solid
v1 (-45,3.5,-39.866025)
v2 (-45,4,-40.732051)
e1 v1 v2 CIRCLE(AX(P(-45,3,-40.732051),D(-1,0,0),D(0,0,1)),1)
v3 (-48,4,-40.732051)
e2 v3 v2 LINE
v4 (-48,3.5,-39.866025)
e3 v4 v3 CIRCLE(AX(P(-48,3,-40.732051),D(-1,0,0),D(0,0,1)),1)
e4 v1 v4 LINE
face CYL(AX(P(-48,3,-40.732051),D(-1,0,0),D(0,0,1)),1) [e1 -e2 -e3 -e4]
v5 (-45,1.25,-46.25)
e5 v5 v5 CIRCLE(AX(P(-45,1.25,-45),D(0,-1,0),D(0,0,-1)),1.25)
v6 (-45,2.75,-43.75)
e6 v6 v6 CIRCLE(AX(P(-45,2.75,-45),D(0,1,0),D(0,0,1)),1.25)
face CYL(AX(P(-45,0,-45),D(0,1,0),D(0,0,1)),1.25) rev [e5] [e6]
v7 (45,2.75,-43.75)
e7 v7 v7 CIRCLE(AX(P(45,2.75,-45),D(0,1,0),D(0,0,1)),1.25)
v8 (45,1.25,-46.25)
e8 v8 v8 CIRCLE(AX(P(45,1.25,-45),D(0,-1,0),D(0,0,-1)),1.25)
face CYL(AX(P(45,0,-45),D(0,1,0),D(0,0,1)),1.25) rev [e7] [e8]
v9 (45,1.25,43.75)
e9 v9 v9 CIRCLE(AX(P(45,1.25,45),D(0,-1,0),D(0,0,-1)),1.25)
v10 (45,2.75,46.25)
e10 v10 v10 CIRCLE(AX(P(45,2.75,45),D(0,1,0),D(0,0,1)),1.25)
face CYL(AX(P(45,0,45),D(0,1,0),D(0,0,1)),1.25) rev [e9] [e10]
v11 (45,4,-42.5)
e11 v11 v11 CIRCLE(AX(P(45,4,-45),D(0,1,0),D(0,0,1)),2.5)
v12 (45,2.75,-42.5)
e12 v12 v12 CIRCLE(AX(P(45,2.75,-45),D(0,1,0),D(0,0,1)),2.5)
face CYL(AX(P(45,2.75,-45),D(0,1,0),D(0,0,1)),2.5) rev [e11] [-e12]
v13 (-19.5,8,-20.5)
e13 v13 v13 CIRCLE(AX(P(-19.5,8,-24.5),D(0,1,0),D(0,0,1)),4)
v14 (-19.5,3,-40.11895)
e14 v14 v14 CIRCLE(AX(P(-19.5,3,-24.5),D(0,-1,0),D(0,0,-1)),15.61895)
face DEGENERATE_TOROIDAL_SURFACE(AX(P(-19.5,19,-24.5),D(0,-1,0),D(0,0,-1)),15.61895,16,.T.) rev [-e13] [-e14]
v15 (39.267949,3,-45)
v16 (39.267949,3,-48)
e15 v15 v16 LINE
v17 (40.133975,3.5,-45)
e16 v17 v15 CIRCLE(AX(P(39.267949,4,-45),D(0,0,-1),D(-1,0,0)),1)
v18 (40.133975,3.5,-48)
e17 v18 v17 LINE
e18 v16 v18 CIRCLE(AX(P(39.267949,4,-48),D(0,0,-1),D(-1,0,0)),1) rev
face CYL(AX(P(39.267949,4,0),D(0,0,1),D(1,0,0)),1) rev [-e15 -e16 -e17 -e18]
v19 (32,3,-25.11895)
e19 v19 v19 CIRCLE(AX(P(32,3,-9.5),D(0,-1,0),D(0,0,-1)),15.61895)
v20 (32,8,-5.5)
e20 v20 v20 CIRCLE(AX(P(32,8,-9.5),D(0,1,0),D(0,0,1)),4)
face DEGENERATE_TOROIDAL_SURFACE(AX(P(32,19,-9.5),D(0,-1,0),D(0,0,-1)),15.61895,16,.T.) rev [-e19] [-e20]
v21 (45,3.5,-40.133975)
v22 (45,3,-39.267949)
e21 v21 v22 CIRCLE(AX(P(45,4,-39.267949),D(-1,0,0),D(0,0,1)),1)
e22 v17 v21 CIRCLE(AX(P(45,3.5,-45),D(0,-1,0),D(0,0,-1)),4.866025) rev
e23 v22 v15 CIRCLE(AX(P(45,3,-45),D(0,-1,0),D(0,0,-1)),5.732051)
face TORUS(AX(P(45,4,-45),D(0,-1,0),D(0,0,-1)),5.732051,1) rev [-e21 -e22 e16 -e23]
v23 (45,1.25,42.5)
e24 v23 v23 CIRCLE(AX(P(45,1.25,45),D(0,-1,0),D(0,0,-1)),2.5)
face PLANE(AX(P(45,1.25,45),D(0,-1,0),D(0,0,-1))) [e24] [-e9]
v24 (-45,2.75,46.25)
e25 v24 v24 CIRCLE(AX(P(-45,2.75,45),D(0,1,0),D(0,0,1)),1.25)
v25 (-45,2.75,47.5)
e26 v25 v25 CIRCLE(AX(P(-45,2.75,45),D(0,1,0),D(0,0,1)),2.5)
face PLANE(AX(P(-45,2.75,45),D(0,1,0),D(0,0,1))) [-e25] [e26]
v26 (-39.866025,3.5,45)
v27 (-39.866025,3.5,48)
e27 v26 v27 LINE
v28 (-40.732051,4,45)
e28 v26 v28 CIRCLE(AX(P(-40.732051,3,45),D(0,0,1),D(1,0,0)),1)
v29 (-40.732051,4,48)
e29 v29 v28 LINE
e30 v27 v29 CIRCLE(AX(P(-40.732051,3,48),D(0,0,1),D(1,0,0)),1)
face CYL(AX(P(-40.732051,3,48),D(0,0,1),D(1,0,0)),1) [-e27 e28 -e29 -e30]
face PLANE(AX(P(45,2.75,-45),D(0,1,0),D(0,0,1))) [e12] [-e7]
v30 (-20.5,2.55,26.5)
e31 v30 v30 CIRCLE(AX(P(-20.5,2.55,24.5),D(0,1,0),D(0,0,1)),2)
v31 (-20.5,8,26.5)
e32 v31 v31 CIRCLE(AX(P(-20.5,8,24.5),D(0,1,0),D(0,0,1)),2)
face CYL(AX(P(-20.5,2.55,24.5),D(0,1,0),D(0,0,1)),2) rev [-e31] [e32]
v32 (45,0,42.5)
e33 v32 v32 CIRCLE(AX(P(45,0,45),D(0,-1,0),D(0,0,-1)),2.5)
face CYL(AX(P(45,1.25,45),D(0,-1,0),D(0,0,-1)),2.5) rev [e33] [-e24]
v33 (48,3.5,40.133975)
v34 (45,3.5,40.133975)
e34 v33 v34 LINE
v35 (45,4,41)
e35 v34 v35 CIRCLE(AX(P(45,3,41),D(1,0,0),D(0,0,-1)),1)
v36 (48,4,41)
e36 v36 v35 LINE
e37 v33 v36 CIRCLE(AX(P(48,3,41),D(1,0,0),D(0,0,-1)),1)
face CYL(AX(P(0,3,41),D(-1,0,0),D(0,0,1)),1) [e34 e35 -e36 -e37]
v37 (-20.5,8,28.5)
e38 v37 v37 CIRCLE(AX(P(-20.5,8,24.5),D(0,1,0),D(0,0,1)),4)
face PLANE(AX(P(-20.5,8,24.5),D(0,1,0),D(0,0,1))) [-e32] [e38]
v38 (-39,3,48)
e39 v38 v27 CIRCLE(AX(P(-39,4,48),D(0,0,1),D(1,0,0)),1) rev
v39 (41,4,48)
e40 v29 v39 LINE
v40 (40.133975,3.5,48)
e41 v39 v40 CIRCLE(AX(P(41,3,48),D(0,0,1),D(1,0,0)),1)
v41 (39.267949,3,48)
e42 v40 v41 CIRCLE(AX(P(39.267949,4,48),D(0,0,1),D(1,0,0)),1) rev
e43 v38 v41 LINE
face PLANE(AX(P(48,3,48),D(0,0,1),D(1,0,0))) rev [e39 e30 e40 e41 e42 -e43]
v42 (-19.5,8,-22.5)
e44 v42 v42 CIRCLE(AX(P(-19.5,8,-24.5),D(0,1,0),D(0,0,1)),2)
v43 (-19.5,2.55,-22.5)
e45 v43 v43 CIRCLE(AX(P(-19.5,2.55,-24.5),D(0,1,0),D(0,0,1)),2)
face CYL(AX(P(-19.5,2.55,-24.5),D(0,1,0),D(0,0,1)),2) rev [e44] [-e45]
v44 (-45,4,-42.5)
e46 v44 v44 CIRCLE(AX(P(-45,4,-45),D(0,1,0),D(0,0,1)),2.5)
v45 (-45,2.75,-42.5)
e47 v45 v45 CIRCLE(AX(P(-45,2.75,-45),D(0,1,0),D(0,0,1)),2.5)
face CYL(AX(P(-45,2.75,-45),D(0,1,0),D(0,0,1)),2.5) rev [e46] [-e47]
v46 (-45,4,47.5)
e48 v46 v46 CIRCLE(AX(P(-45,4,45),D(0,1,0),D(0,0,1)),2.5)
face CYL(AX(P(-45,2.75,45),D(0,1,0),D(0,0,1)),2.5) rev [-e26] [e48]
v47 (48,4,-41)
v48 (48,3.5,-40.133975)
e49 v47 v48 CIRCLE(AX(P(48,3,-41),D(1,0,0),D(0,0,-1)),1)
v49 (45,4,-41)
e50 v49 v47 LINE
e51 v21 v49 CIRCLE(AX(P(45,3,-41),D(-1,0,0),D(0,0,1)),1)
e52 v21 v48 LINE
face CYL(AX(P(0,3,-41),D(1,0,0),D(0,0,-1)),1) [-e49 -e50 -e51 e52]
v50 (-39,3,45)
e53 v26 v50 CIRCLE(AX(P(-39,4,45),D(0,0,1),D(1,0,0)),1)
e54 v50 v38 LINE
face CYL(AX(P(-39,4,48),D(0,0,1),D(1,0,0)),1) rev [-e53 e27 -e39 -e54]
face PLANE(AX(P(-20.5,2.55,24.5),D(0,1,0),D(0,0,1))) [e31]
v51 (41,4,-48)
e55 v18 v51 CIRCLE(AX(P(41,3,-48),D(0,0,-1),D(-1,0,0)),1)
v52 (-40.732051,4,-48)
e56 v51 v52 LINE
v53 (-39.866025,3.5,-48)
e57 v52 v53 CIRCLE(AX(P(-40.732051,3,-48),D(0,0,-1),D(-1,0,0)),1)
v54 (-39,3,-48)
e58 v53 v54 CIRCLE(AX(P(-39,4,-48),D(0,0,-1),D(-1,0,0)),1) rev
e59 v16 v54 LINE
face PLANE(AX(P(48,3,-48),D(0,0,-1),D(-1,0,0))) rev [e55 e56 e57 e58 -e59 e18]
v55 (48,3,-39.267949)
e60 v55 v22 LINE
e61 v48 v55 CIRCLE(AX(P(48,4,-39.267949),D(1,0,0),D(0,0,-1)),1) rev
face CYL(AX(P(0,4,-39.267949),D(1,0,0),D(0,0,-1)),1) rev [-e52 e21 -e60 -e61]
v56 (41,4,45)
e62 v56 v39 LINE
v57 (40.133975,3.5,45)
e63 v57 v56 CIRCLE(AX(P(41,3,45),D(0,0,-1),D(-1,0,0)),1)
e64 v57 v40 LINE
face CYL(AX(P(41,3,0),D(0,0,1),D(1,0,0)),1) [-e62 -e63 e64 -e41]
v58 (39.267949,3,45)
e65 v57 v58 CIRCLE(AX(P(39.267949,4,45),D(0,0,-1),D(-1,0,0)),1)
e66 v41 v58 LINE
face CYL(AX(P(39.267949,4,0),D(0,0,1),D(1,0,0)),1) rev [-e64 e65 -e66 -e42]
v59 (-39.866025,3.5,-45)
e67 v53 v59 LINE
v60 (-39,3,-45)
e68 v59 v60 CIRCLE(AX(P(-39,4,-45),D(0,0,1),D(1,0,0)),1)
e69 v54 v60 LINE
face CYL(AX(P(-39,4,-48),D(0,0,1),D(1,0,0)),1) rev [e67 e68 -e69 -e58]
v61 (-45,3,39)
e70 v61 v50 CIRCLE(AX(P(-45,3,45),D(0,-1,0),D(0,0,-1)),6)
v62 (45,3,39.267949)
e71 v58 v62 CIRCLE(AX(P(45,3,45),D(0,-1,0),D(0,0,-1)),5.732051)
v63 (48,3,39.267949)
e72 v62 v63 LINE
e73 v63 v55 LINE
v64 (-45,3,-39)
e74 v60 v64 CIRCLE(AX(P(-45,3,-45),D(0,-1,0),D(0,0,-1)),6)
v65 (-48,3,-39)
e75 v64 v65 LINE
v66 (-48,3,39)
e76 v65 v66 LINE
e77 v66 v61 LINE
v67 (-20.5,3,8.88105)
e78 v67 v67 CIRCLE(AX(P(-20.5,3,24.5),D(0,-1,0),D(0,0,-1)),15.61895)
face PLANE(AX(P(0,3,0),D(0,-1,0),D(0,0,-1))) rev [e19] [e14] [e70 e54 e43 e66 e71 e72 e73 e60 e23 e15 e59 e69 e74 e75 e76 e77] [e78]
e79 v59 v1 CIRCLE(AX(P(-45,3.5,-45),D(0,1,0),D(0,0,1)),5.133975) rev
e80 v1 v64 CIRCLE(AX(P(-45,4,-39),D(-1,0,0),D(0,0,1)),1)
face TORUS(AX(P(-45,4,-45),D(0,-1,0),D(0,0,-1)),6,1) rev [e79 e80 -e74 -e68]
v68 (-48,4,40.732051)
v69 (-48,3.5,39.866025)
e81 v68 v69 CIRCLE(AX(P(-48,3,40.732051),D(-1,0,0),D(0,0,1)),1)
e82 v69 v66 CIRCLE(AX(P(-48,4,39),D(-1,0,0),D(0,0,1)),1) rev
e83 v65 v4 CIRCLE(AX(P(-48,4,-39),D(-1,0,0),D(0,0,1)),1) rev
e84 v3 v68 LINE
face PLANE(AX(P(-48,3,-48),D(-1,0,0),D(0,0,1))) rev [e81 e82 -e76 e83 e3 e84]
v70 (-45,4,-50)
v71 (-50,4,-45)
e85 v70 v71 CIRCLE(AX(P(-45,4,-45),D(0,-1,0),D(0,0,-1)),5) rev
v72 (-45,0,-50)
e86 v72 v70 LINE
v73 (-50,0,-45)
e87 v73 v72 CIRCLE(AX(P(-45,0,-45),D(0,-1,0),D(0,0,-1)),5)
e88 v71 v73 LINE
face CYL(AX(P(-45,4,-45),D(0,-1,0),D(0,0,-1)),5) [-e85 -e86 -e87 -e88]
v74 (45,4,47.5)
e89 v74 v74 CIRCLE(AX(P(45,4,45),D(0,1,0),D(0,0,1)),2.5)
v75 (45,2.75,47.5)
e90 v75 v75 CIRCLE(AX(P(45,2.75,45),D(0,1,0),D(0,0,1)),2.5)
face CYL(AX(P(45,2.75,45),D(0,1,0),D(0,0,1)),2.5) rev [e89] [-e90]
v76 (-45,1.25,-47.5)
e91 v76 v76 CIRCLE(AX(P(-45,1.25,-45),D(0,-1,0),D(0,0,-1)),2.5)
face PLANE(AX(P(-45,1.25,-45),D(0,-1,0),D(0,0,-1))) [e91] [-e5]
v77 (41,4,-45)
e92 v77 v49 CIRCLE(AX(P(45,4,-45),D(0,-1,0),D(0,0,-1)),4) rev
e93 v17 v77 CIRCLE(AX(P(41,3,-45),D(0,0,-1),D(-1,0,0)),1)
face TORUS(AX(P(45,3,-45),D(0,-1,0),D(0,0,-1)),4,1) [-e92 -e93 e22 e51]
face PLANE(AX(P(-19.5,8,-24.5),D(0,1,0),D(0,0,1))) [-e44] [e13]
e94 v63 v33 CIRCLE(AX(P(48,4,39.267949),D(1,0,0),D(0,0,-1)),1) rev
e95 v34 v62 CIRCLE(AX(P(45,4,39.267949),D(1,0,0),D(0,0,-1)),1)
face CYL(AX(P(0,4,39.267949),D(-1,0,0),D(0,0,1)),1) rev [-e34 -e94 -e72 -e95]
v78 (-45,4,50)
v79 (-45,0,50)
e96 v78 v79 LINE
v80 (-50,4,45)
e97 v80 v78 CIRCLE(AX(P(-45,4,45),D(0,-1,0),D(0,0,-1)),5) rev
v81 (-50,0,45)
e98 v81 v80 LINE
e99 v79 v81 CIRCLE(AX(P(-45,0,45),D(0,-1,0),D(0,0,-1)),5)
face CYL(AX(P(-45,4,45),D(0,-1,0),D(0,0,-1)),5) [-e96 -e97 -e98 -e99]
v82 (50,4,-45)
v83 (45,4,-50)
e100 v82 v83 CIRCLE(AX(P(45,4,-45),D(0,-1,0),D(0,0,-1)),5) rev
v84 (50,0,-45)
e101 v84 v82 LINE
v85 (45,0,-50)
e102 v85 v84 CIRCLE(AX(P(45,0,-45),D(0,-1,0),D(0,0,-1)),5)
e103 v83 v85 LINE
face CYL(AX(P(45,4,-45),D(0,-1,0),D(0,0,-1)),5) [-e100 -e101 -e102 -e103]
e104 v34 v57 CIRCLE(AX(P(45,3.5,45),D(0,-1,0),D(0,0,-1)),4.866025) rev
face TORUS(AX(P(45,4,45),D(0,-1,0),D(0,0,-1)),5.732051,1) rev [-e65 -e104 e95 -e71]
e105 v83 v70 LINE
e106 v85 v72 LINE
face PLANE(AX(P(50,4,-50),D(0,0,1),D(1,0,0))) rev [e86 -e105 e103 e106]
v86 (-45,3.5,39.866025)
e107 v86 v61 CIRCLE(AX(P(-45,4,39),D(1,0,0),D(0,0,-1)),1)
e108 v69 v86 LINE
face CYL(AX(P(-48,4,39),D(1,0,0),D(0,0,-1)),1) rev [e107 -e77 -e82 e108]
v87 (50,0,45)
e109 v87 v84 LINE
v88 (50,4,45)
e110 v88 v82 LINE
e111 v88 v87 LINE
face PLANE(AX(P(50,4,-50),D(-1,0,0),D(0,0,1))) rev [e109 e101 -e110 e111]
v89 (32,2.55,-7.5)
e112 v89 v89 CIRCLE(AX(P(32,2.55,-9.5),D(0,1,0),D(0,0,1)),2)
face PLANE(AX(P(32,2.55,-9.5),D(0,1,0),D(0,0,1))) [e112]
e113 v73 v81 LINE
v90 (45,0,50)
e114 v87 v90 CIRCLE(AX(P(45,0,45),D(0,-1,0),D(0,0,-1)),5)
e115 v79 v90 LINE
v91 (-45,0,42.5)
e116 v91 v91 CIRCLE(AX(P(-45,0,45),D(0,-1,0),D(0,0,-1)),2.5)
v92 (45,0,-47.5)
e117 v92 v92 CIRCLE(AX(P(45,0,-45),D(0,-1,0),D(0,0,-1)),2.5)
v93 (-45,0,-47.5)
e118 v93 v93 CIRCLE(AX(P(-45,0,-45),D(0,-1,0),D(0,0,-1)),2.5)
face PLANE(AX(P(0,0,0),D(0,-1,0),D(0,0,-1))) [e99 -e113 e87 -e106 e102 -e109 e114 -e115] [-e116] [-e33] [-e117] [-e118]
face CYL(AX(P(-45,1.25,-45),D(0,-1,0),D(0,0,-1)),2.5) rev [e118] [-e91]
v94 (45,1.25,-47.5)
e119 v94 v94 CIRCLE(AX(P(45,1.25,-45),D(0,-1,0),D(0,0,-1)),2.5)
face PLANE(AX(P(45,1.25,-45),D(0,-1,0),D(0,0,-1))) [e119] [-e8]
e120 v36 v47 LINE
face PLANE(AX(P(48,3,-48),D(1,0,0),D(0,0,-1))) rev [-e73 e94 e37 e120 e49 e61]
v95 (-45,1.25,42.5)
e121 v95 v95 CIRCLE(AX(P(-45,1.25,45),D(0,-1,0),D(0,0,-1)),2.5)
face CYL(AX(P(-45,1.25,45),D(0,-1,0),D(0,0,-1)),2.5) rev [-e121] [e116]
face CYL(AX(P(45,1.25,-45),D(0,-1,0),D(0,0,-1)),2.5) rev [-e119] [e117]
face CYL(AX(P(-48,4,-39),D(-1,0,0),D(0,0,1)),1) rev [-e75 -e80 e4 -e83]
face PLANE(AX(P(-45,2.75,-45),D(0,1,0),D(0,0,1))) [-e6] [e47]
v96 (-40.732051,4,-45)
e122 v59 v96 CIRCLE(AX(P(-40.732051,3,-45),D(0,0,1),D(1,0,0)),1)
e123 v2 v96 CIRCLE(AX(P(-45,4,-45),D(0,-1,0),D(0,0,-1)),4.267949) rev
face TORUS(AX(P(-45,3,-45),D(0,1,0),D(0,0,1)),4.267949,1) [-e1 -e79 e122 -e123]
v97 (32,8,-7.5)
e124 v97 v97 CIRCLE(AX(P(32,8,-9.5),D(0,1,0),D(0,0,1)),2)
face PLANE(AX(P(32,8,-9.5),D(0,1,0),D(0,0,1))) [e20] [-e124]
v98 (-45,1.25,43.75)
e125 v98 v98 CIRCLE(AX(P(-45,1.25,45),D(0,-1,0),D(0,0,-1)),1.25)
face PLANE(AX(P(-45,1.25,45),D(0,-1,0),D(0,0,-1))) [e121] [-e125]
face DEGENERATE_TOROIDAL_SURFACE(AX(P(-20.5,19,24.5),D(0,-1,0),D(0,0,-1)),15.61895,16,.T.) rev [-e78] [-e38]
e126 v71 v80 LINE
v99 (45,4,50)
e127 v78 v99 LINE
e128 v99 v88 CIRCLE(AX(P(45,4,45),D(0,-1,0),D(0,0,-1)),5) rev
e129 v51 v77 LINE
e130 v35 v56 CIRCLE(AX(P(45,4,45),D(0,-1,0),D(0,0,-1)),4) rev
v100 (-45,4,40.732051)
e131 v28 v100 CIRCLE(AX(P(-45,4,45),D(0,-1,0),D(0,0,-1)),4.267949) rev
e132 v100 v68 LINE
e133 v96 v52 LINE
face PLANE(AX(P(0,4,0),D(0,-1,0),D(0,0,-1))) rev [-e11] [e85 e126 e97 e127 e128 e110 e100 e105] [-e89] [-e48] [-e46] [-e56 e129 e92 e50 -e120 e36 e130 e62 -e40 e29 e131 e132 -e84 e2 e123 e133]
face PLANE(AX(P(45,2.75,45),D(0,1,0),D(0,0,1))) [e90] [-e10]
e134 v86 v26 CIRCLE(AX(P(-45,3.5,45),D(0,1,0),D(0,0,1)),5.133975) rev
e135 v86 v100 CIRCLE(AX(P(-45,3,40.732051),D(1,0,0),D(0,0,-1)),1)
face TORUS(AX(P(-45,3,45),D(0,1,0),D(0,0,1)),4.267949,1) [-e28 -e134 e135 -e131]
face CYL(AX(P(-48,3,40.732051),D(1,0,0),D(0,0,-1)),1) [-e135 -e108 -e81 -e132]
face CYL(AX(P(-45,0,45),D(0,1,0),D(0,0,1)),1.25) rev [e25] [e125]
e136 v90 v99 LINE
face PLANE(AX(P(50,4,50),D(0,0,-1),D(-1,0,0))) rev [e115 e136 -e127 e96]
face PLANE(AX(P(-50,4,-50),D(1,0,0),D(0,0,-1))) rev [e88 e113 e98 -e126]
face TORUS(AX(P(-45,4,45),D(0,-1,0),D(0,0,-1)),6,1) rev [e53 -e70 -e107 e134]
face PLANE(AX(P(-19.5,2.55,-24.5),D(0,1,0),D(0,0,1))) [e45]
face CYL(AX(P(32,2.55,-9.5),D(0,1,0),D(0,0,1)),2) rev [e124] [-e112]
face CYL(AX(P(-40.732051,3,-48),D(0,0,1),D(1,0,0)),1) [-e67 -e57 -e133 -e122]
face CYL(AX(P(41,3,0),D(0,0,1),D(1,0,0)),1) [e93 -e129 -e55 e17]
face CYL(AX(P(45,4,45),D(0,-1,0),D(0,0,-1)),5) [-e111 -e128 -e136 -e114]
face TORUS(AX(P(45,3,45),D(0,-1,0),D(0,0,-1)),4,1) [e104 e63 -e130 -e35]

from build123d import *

# Parameters (mm, degrees)
SKETCH1_W            = 100
SKETCH1_H            = 100
BOSS_EXTRUDE1_DEPTH  = 4
SKETCH2_W            = 96
SKETCH2_H            = 96
CUT_EXTRUDE1_DEPTH   = 1
SKETCH7_W            = 8
SKETCH7_H            = 8
BOSS_EXTRUDE4_DEPTH  = 1
SKETCH9_W            = 8
SKETCH9_H            = 8
BOSS_EXTRUDE5_DEPTH  = 1
SKETCH10_W           = 8
SKETCH10_H           = 8
BOSS_EXTRUDE6_DEPTH  = 1
SKETCH11_W           = 8
SKETCH11_H           = 8
BOSS_EXTRUDE7_DEPTH  = 1
FILLET8_R            = 5
FILLET9_R            = 5
FILLET10_R           = 5
FILLET11_R           = 5
FILLET12_R           = 5
FILLET13_R           = 5
FILLET14_R           = 5
FILLET15_R           = 5
FILLET18_R           = 1
FILLET19_R           = 1
FILLET20_R           = 1
FILLET21_R           = 1
FILLET22_R           = 1
FILLET23_R           = 1
FILLET24_R           = 1
FILLET25_R           = 1
SKETCH15_R           = 2.5
CUT_EXTRUDE7_DEPTH   = 1.25
CUT_EXTRUDE8_START   = -1.25
SKETCH16_R           = 2.5
CUT_EXTRUDE8_DEPTH   = 1.25
SKETCH17_R           = 1.1
CUT_EXTRUDE9_DEPTH   = 1.5
SKETCH18_R           = 2.5
CUT_EXTRUDE10_DEPTH  = 1.25
CUT_EXTRUDE11_START  = -1.25
SKETCH19_R           = 2.5
CUT_EXTRUDE11_DEPTH  = 1.25
SKETCH20_R           = 1.05
CUT_EXTRUDE12_DEPTH  = 71.764132864
SKETCH21_R           = 2.5
CUT_EXTRUDE13_DEPTH  = 1.25
CUT_EXTRUDE14_START  = -1.25
SKETCH23_R           = 2.5
CUT_EXTRUDE14_DEPTH  = 1.25
SKETCH24_R           = 1.05
CUT_EXTRUDE15_DEPTH  = 71.764132864
SKETCH25_R           = 2.5
CUT_EXTRUDE16_DEPTH  = 1.25
CUT_EXTRUDE17_START  = -1.25
SKETCH26_R           = 2.5
CUT_EXTRUDE17_DEPTH  = 1.25
SKETCH27_R           = 1.05
CUT_EXTRUDE18_DEPTH  = 71.764132864
SKETCH28_R           = 4
BOSS_EXTRUDE9_DEPTH  = 5
SKETCH31_R           = 4
BOSS_EXTRUDE10_DEPTH = 5
SKETCH33_R           = 4
BOSS_EXTRUDE11_DEPTH = 5
SKETCH39_R           = 2
CUT_EXTRUDE22_DEPTH  = 5.45
SKETCH40_R           = 2
CUT_EXTRUDE23_DEPTH  = 5.45
SKETCH41_R           = 2
CUT_EXTRUDE24_DEPTH  = 5.45
FILLET27_R           = 16
SKETCH42_R           = 1.25
CUT_EXTRUDE25_DEPTH  = 71.905306579
SKETCH43_R           = 1.25
CUT_EXTRUDE26_DEPTH  = 71.905306579
SKETCH44_R           = 1.25
CUT_EXTRUDE27_DEPTH  = 71.905306579
SKETCH45_R           = 1.25
CUT_EXTRUDE28_DEPTH  = 71.905306579


# Some blends are built 0.0001 mm under size
with BuildPart() as part:
    # Sketch1 → Boss-Extrude1 (new body)
    with BuildSketch(Plane(origin=(0, 0, 0), x_dir=(1, 0, 0), z_dir=(0, 1, 0))):
        Rectangle(SKETCH1_W, SKETCH1_H)
    extrude(amount=BOSS_EXTRUDE1_DEPTH)

    # Sketch2 → Cut-Extrude1 (cut)
    with BuildSketch(Plane(origin=(0, 4, 0), x_dir=(1, 0, 0), z_dir=(0, 1, 0))):
        Rectangle(SKETCH2_W, SKETCH2_H)
    extrude(amount=-CUT_EXTRUDE1_DEPTH, mode=Mode.SUBTRACT)

    # Sketch7 → Boss-Extrude4 (add)
    with BuildSketch(Plane(origin=(0, 3, 0), x_dir=(1, 0, 0), z_dir=(0, 1, 0))):
        with Locations((-44, 44)):
            Rectangle(SKETCH7_W, SKETCH7_H)
    extrude(amount=BOSS_EXTRUDE4_DEPTH)

    # Sketch9 → Boss-Extrude5 (add)
    with BuildSketch(Plane(origin=(0, 3, 0), x_dir=(1, 0, 0), z_dir=(0, 1, 0))):
        with Locations((44, 44)):
            Rectangle(SKETCH9_W, SKETCH9_H)
    extrude(amount=BOSS_EXTRUDE5_DEPTH)

    # Sketch10 → Boss-Extrude6 (add)
    with BuildSketch(Plane(origin=(0, 3, 0), x_dir=(1, 0, 0), z_dir=(0, 1, 0))):
        with Locations((-44, -44)):
            Rectangle(SKETCH10_W, SKETCH10_H)
    extrude(amount=BOSS_EXTRUDE6_DEPTH)

    # Sketch11 → Boss-Extrude7 (add)
    with BuildSketch(Plane(origin=(0, 3, 0), x_dir=(1, 0, 0), z_dir=(0, 1, 0))):
        with Locations((44, -44)):
            Rectangle(SKETCH11_W, SKETCH11_H)
    extrude(amount=BOSS_EXTRUDE7_DEPTH)

    # Fillet8
    fillet8_edges = [part.edges().sort_by_distance(p)[0] for p in [
        (-40, 3.5, -40),
    ]]
    fillet(fillet8_edges, radius=FILLET8_R)

    # Fillet9
    fillet9_edges = [part.edges().sort_by_distance(p)[0] for p in [
        (-40, 3.5, 40),
    ]]
    fillet(fillet9_edges, radius=FILLET9_R)

    # Fillet10
    fillet10_edges = [part.edges().sort_by_distance(p)[0] for p in [
        (40, 3.5, 40),
    ]]
    fillet(fillet10_edges, radius=FILLET10_R)

    # Fillet11
    fillet11_edges = [part.edges().sort_by_distance(p)[0] for p in [
        (40, 3.5, -40),
    ]]
    fillet(fillet11_edges, radius=FILLET11_R)

    # Fillet12
    fillet12_edges = [part.edges().sort_by_distance(p)[0] for p in [
        (50, 2, -50),
    ]]
    fillet(fillet12_edges, radius=FILLET12_R)

    # Fillet13
    fillet13_edges = [part.edges().sort_by_distance(p)[0] for p in [
        (50, 2, 50),
    ]]
    fillet(fillet13_edges, radius=FILLET13_R)

    # Fillet14
    fillet14_edges = [part.edges().sort_by_distance(p)[0] for p in [
        (-50, 2, 50),
    ]]
    fillet(fillet14_edges, radius=FILLET14_R)

    # Fillet15
    fillet15_edges = [part.edges().sort_by_distance(p)[0] for p in [
        (-50, 2, -50),
    ]]
    fillet(fillet15_edges, radius=FILLET15_R)

    # Fillet18
    fillet18_edges = [part.edges().sort_by_distance(p)[0] for p in [
        (-40, 3, -46.5),
        (-46.5, 3, -40),
        (-41.464466094, 3, -41.464466094),
    ]]
    fillet(fillet18_edges, radius=FILLET18_R - 0.0001)  # a hair under: the kernel refuses the full size

    # Fillet19
    # the kernel refuses this fillet: 1 mm, written as the material it takes off along each edge
    with BuildSketch(Plane(origin=(-45, 4, -40), x_dir=(0, 0, -1), z_dir=(-1, 0, 0))) as fillet19_piece_1:
        with BuildLine():
            CenterArc((0.732093072, 1), FILLET19_R, 209.998345944, 60.001654056)
            Line((-0.133946766, 0.500025001), (-0.22055075, 0.450027501))
            ThreePointArc((-0.22055075, 0.450027501), (-0.1, 0.0001), (-0.1, 0))
            Line((-0.1, 0), (0, -0.1))
            Line((0, -0.1), (0.732093072, -0.1))
            Line((0.732093072, -0.1), (0.732093072, 0))
        make_face()
    extrude(amount=3, mode=Mode.SUBTRACT)
    with BuildSketch(Plane(origin=(-40, 4, -48), x_dir=(0.2587568099374835, -0.9659425000024469, 0), z_dir=(0, 0, 1))) as fillet19_piece_2:
        with BuildLine():
            CenterArc((0.776508432, -0.965916622), FILLET19_R, 105.002037513, 60.001654056)
            Line((-0.189434068, -0.707159812), (-0.286028318, -0.681284131))
            Line((-0.286028318, -0.681284131), (-0.09659425, 0.025875681))
            Line((-0.09659425, 0.025875681), (0.025875681, 0.09659425))
            ThreePointArc((0.025875681, 0.09659425), (0.025972275, 0.096568374), (0.491769698, 0.096591662))
            Line((0.491769698, 0.096591662), (0.517655038, 0))
        make_face()
    extrude(amount=3, mode=Mode.SUBTRACT)
    with BuildSketch(Plane(origin=(-45, 4, -45), x_dir=(0, 0, 1), z_dir=(-1, 0, 0))) as fillet19_piece_3:
        with BuildLine():
            CenterArc((4.267906928, -1), FILLET19_R, 29.998345944, 60.001654056)
            Line((5.133946766, -0.500025001), (5.22055075, -0.450027501))
            ThreePointArc((5.22055075, -0.450027501), (5.1, -0.0001), (5.1, 0))
            Line((5.1, 0), (5, 0.1))
            Line((5, 0.1), (4.267906928, 0.1))
            Line((4.267906928, 0.1), (4.267906928, 0))
        make_face()
    revolve(axis=Axis((-45, 4, -45), (0, 1, 0)), revolution_arc=90, mode=Mode.SUBTRACT)

    # Fillet20
    fillet20_edges = [part.edges().sort_by_distance(p)[0] for p in [
        (40, 4, -46.5),
        (46.5, 4, -40),
        (41.464466094, 4, -41.464466094),
    ]]
    fillet(fillet20_edges, radius=FILLET20_R - 0.0001)  # a hair under: the kernel refuses the full size

    # Fillet21
    fillet21_edges = [part.edges().sort_by_distance(p)[0] for p in [
        (46.5, 3, -40),
        (41.464466094, 3, -41.464466094),
        (40, 3, -46.5),
    ]]
    fillet(fillet21_edges, radius=FILLET21_R)

    # Fillet22
    fillet22_edges = [part.edges().sort_by_distance(p)[0] for p in [
        (-46.5, 3, 40),
        (-40, 3, 46.5),
        (-41.464466094, 3, 41.464466094),
    ]]
    fillet(fillet22_edges, radius=FILLET22_R - 0.0001)  # a hair under: the kernel refuses the full size

    # Fillet23
    # the kernel refuses this fillet: 1 mm, written as the material it takes off along each edge
    with BuildSketch(Plane(origin=(-40, 4, 48), x_dir=(-1, 0, 0), z_dir=(0, 0, -1))) as fillet23_piece_1:
        with BuildLine():
            CenterArc((0.732093072, -1), FILLET23_R, 90, 60.001654056)
            Line((-0.133946766, -0.500025001), (-0.22055075, -0.450027501))
            ThreePointArc((-0.22055075, -0.450027501), (-0.1, -0.0001), (-0.1, 0))
            Line((-0.1, 0), (0, 0.1))
            Line((0, 0.1), (0.732093072, 0.1))
            Line((0.732093072, 0.1), (0.732093072, 0))
        make_face()
    extrude(amount=3, mode=Mode.SUBTRACT)
    with BuildSketch(Plane(origin=(-45, 4, 40), x_dir=(0, -0.9659425000024469, -0.2587568099374835), z_dir=(-1, 0, 0))) as fillet23_piece_2:
        with BuildLine():
            CenterArc((0.776508432, 0.965916622), FILLET23_R, 194.996308431, 60.001654056)
            Line((-0.189434068, 0.707159812), (-0.286028318, 0.681284131))
            Line((-0.286028318, 0.681284131), (-0.09659425, -0.025875681))
            Line((-0.09659425, -0.025875681), (0.025875681, -0.09659425))
            ThreePointArc((0.025875681, -0.09659425), (0.025972275, -0.096568374), (0.491769698, -0.096591662))
            Line((0.491769698, -0.096591662), (0.517655038, 0))
        make_face()
    extrude(amount=3, mode=Mode.SUBTRACT)
    with BuildSketch(Plane(origin=(-45, 4, 45), x_dir=(0, 0, -1), z_dir=(-1, 0, 0))) as fillet23_piece_3:
        with BuildLine():
            CenterArc((4.267906928, 1), FILLET23_R, 270, 60.001654056)
            Line((5.133946766, 0.500025001), (5.22055075, 0.450027501))
            ThreePointArc((5.22055075, 0.450027501), (5.1, 0.0001), (5.1, 0))
            Line((5.1, 0), (5, -0.1))
            Line((5, -0.1), (4.267906928, -0.1))
            Line((4.267906928, -0.1), (4.267906928, 0))
        make_face()
    revolve(axis=Axis((-45, 4, 45), (0, -1, 0)), revolution_arc=90, mode=Mode.SUBTRACT)

    # Fillet24
    fillet24_edges = [part.edges().sort_by_distance(p)[0] for p in [
        (46.5, 4, 40),
        (40, 4, 46.5),
        (41.464466094, 4, 41.464466094),
    ]]
    fillet(fillet24_edges, radius=FILLET24_R - 0.0001)  # a hair under: the kernel refuses the full size

    # Fillet25
    fillet25_edges = [part.edges().sort_by_distance(p)[0] for p in [
        (40, 3, 46.5),
        (41.464466094, 3, 41.464466094),
        (46.5, 3, 40),
    ]]
    fillet(fillet25_edges, radius=FILLET25_R)

    # Sketch15 → Cut-Extrude7 (cut)
    with BuildSketch(Plane(origin=(0, 4, 0), x_dir=(1, 0, 0), z_dir=(0, 1, 0))):
        with Locations(Location((-45, 45, 0), (0, 0, 270))):
            Circle(SKETCH15_R)
    extrude(amount=-CUT_EXTRUDE7_DEPTH, mode=Mode.SUBTRACT)

    # Sketch16 → Cut-Extrude8 (cut)
    with BuildSketch(Plane.XZ.offset(CUT_EXTRUDE8_START)):
        with Locations(Location((-45, -45, 0), (0, 0, 90))):
            Circle(SKETCH16_R)
    extrude(amount=CUT_EXTRUDE8_DEPTH, mode=Mode.SUBTRACT)

    # Sketch17 → Cut-Extrude9 (cut)
    with BuildSketch(Plane(origin=(0, 2.75, 0), x_dir=(1, 0, 0), z_dir=(0, 1, 0))):
        with Locations(Location((-45, 45, 0), (0, 0, 270))):
            Circle(SKETCH17_R)
    extrude(amount=-CUT_EXTRUDE9_DEPTH, mode=Mode.SUBTRACT)

    # Sketch18 → Cut-Extrude10 (cut)
    with BuildSketch(Plane(origin=(0, 4, 0), x_dir=(1, 0, 0), z_dir=(0, 1, 0))):
        with Locations(Location((45, 45, 0), (0, 0, 270))):
            Circle(SKETCH18_R)
    extrude(amount=-CUT_EXTRUDE10_DEPTH, mode=Mode.SUBTRACT)

    # Sketch19 → Cut-Extrude11 (cut)
    with BuildSketch(Plane.XZ.offset(CUT_EXTRUDE11_START)):
        with Locations(Location((45, -45, 0), (0, 0, 90))):
            Circle(SKETCH19_R)
    extrude(amount=CUT_EXTRUDE11_DEPTH, mode=Mode.SUBTRACT)

    # Sketch20 → Cut-Extrude12 (cut, through all)
    with BuildSketch(Plane(origin=(0, 2.75, 0), x_dir=(1, 0, 0), z_dir=(0, 1, 0))):
        with Locations(Location((45, 45, 0), (0, 0, 270))):
            Circle(SKETCH20_R)
    extrude(amount=-CUT_EXTRUDE12_DEPTH, mode=Mode.SUBTRACT)

    # Sketch21 → Cut-Extrude13 (cut)
    with BuildSketch(Plane(origin=(0, 4, 0), x_dir=(1, 0, 0), z_dir=(0, 1, 0))):
        with Locations(Location((-45, -45, 0), (0, 0, 270))):
            Circle(SKETCH21_R)
    extrude(amount=-CUT_EXTRUDE13_DEPTH, mode=Mode.SUBTRACT)

    # Sketch23 → Cut-Extrude14 (cut)
    with BuildSketch(Plane(origin=(0, 0, 0), x_dir=(-1, 0, 0), z_dir=(0, -1, 0)).offset(CUT_EXTRUDE14_START)):
        with Locations(Location((45, -45, 0), (0, 0, 270))):
            Circle(SKETCH23_R)
    extrude(amount=CUT_EXTRUDE14_DEPTH, mode=Mode.SUBTRACT)

    # Sketch24 → Cut-Extrude15 (cut, through all)
    with BuildSketch(Plane(origin=(0, 2.75, 0), x_dir=(1, 0, 0), z_dir=(0, 1, 0))):
        with Locations(Location((-45, -45, 0), (0, 0, 270))):
            Circle(SKETCH24_R)
    extrude(amount=-CUT_EXTRUDE15_DEPTH, mode=Mode.SUBTRACT)

    # Sketch25 → Cut-Extrude16 (cut)
    with BuildSketch(Plane.XZ):
        with Locations(Location((45, 45, 0), (0, 0, 270))):
            Circle(SKETCH25_R)
    extrude(amount=-CUT_EXTRUDE16_DEPTH, mode=Mode.SUBTRACT)

    # Sketch26 → Cut-Extrude17 (cut)
    with BuildSketch(Plane(origin=(0, 4, 0), x_dir=(1, 0, 0), z_dir=(0, 1, 0)).offset(CUT_EXTRUDE17_START)):
        with Locations(Location((45, -45, 0), (0, 0, 90))):
            Circle(SKETCH26_R)
    extrude(amount=CUT_EXTRUDE17_DEPTH, mode=Mode.SUBTRACT)

    # Sketch27 → Cut-Extrude18 (cut, through all)
    with BuildSketch(Plane(origin=(0, 2.75, 0), x_dir=(1, 0, 0), z_dir=(0, 1, 0))):
        with Locations(Location((45, -45, 0), (0, 0, 270))):
            Circle(SKETCH27_R)
    extrude(amount=-CUT_EXTRUDE18_DEPTH, mode=Mode.SUBTRACT)

    # Sketch28 → Boss-Extrude9 (add)
    with BuildSketch(Plane(origin=(0, 3, 0), x_dir=(1, 0, 0), z_dir=(0, 1, 0))):
        with Locations(Location((-19.5, 24.5, 0), (0, 0, 90))):
            Circle(SKETCH28_R)
    extrude(amount=BOSS_EXTRUDE9_DEPTH)

    # Sketch31 → Boss-Extrude10 (add)
    with BuildSketch(Plane(origin=(0, 3, 0), x_dir=(1, 0, 0), z_dir=(0, 1, 0))):
        with Locations(Location((-20.5, -24.5, 0), (0, 0, 90))):
            Circle(SKETCH31_R)
    extrude(amount=BOSS_EXTRUDE10_DEPTH)

    # Sketch33 → Boss-Extrude11 (add)
    with BuildSketch(Plane(origin=(0, 3, 0), x_dir=(1, 0, 0), z_dir=(0, 1, 0))):
        with Locations(Location((32, 9.5, 0), (0, 0, 90))):
            Circle(SKETCH33_R)
    extrude(amount=BOSS_EXTRUDE11_DEPTH)

    # Sketch39 → Cut-Extrude22 (cut)
    with BuildSketch(Plane(origin=(0, 8, 0), x_dir=(1, 0, 0), z_dir=(0, 1, 0))):
        with Locations(Location((-19.5, 24.5, 0), (0, 0, 270))):
            Circle(SKETCH39_R)
    extrude(amount=-CUT_EXTRUDE22_DEPTH, mode=Mode.SUBTRACT)

    # Sketch40 → Cut-Extrude23 (cut)
    with BuildSketch(Plane(origin=(0, 8, 0), x_dir=(1, 0, 0), z_dir=(0, 1, 0))):
        with Locations(Location((32, 9.5, 0), (0, 0, 270))):
            Circle(SKETCH40_R)
    extrude(amount=-CUT_EXTRUDE23_DEPTH, mode=Mode.SUBTRACT)

    # Sketch41 → Cut-Extrude24 (cut)
    with BuildSketch(Plane(origin=(0, 8, 0), x_dir=(1, 0, 0), z_dir=(0, 1, 0))):
        with Locations(Location((-20.5, -24.5, 0), (0, 0, 270))):
            Circle(SKETCH41_R)
    extrude(amount=-CUT_EXTRUDE24_DEPTH, mode=Mode.SUBTRACT)

    # Fillet27
    # the kernel refuses this fillet: 16 mm, written as the material it adds along each edge
    with BuildSketch(Plane(origin=(-19.5, 3, -24.5), x_dir=(0, 0, -1), z_dir=(1, 0, 0))) as fillet27_piece_1:
        with BuildLine():
            CenterArc((15.618950039, 16), FILLET27_R, 223.432536558, 46.567463442)
            Line((4, 5), (3.767620999, 4.78))
            ThreePointArc((3.767620999, 4.78), (3.68, 2.5), (3.68, 0))
            Line((3.68, 0), (4, -0.32))
            Line((4, -0.32), (15.618950039, -0.32))
            Line((15.618950039, -0.32), (15.618950039, 0))
        make_face()
    revolve(axis=Axis((-19.5, 3, -24.5), (0, 1, 0)))
    with BuildSketch(Plane(origin=(-20.5, 3, 24.5), x_dir=(0, 0, -1), z_dir=(1, 0, 0))) as fillet27_piece_2:
        with BuildLine():
            CenterArc((15.618950039, 16), FILLET27_R, 223.432536558, 46.567463442)
            Line((4, 5), (3.767620999, 4.78))
            ThreePointArc((3.767620999, 4.78), (3.68, 2.5), (3.68, 0))
            Line((3.68, 0), (4, -0.32))
            Line((4, -0.32), (15.618950039, -0.32))
            Line((15.618950039, -0.32), (15.618950039, 0))
        make_face()
    revolve(axis=Axis((-20.5, 3, 24.5), (0, 1, 0)))
    with BuildSketch(Plane(origin=(32, 3, -9.5), x_dir=(0, 0, -1), z_dir=(1, 0, 0))) as fillet27_piece_3:
        with BuildLine():
            CenterArc((15.618950039, 16), FILLET27_R, 223.432536558, 46.567463442)
            Line((4, 5), (3.767620999, 4.78))
            ThreePointArc((3.767620999, 4.78), (3.68, 2.5), (3.68, 0))
            Line((3.68, 0), (4, -0.32))
            Line((4, -0.32), (15.618950039, -0.32))
            Line((15.618950039, -0.32), (15.618950039, 0))
        make_face()
    revolve(axis=Axis((32, 3, -9.5), (0, 1, 0)))

    # Sketch42 → Cut-Extrude25 (cut, through all)
    with BuildSketch(Plane(origin=(0, 2.75, 0), x_dir=(1, 0, 0), z_dir=(0, 1, 0))):
        with Locations(Location((45, -45, 0), (0, 0, 270))):
            Circle(SKETCH42_R)
    extrude(amount=-CUT_EXTRUDE25_DEPTH, mode=Mode.SUBTRACT)

    # Sketch43 → Cut-Extrude26 (cut, through all)
    with BuildSketch(Plane(origin=(0, 2.75, 0), x_dir=(1, 0, 0), z_dir=(0, 1, 0))):
        with Locations(Location((-45, 45, 0), (0, 0, 270))):
            Circle(SKETCH43_R)
    extrude(amount=-CUT_EXTRUDE26_DEPTH, mode=Mode.SUBTRACT)

    # Sketch44 → Cut-Extrude27 (cut, through all)
    with BuildSketch(Plane(origin=(0, 2.75, 0), x_dir=(1, 0, 0), z_dir=(0, 1, 0))):
        with Locations(Location((-45, -45, 0), (0, 0, 270))):
            Circle(SKETCH44_R)
    extrude(amount=-CUT_EXTRUDE27_DEPTH, mode=Mode.SUBTRACT)

    # Sketch45 → Cut-Extrude28 (cut, through all)
    with BuildSketch(Plane(origin=(0, 2.75, 0), x_dir=(1, 0, 0), z_dir=(0, 1, 0))):
        with Locations(Location((45, 45, 0), (0, 0, 270))):
            Circle(SKETCH45_R)
    extrude(amount=-CUT_EXTRUDE28_DEPTH, mode=Mode.SUBTRACT)


solid = part.part
